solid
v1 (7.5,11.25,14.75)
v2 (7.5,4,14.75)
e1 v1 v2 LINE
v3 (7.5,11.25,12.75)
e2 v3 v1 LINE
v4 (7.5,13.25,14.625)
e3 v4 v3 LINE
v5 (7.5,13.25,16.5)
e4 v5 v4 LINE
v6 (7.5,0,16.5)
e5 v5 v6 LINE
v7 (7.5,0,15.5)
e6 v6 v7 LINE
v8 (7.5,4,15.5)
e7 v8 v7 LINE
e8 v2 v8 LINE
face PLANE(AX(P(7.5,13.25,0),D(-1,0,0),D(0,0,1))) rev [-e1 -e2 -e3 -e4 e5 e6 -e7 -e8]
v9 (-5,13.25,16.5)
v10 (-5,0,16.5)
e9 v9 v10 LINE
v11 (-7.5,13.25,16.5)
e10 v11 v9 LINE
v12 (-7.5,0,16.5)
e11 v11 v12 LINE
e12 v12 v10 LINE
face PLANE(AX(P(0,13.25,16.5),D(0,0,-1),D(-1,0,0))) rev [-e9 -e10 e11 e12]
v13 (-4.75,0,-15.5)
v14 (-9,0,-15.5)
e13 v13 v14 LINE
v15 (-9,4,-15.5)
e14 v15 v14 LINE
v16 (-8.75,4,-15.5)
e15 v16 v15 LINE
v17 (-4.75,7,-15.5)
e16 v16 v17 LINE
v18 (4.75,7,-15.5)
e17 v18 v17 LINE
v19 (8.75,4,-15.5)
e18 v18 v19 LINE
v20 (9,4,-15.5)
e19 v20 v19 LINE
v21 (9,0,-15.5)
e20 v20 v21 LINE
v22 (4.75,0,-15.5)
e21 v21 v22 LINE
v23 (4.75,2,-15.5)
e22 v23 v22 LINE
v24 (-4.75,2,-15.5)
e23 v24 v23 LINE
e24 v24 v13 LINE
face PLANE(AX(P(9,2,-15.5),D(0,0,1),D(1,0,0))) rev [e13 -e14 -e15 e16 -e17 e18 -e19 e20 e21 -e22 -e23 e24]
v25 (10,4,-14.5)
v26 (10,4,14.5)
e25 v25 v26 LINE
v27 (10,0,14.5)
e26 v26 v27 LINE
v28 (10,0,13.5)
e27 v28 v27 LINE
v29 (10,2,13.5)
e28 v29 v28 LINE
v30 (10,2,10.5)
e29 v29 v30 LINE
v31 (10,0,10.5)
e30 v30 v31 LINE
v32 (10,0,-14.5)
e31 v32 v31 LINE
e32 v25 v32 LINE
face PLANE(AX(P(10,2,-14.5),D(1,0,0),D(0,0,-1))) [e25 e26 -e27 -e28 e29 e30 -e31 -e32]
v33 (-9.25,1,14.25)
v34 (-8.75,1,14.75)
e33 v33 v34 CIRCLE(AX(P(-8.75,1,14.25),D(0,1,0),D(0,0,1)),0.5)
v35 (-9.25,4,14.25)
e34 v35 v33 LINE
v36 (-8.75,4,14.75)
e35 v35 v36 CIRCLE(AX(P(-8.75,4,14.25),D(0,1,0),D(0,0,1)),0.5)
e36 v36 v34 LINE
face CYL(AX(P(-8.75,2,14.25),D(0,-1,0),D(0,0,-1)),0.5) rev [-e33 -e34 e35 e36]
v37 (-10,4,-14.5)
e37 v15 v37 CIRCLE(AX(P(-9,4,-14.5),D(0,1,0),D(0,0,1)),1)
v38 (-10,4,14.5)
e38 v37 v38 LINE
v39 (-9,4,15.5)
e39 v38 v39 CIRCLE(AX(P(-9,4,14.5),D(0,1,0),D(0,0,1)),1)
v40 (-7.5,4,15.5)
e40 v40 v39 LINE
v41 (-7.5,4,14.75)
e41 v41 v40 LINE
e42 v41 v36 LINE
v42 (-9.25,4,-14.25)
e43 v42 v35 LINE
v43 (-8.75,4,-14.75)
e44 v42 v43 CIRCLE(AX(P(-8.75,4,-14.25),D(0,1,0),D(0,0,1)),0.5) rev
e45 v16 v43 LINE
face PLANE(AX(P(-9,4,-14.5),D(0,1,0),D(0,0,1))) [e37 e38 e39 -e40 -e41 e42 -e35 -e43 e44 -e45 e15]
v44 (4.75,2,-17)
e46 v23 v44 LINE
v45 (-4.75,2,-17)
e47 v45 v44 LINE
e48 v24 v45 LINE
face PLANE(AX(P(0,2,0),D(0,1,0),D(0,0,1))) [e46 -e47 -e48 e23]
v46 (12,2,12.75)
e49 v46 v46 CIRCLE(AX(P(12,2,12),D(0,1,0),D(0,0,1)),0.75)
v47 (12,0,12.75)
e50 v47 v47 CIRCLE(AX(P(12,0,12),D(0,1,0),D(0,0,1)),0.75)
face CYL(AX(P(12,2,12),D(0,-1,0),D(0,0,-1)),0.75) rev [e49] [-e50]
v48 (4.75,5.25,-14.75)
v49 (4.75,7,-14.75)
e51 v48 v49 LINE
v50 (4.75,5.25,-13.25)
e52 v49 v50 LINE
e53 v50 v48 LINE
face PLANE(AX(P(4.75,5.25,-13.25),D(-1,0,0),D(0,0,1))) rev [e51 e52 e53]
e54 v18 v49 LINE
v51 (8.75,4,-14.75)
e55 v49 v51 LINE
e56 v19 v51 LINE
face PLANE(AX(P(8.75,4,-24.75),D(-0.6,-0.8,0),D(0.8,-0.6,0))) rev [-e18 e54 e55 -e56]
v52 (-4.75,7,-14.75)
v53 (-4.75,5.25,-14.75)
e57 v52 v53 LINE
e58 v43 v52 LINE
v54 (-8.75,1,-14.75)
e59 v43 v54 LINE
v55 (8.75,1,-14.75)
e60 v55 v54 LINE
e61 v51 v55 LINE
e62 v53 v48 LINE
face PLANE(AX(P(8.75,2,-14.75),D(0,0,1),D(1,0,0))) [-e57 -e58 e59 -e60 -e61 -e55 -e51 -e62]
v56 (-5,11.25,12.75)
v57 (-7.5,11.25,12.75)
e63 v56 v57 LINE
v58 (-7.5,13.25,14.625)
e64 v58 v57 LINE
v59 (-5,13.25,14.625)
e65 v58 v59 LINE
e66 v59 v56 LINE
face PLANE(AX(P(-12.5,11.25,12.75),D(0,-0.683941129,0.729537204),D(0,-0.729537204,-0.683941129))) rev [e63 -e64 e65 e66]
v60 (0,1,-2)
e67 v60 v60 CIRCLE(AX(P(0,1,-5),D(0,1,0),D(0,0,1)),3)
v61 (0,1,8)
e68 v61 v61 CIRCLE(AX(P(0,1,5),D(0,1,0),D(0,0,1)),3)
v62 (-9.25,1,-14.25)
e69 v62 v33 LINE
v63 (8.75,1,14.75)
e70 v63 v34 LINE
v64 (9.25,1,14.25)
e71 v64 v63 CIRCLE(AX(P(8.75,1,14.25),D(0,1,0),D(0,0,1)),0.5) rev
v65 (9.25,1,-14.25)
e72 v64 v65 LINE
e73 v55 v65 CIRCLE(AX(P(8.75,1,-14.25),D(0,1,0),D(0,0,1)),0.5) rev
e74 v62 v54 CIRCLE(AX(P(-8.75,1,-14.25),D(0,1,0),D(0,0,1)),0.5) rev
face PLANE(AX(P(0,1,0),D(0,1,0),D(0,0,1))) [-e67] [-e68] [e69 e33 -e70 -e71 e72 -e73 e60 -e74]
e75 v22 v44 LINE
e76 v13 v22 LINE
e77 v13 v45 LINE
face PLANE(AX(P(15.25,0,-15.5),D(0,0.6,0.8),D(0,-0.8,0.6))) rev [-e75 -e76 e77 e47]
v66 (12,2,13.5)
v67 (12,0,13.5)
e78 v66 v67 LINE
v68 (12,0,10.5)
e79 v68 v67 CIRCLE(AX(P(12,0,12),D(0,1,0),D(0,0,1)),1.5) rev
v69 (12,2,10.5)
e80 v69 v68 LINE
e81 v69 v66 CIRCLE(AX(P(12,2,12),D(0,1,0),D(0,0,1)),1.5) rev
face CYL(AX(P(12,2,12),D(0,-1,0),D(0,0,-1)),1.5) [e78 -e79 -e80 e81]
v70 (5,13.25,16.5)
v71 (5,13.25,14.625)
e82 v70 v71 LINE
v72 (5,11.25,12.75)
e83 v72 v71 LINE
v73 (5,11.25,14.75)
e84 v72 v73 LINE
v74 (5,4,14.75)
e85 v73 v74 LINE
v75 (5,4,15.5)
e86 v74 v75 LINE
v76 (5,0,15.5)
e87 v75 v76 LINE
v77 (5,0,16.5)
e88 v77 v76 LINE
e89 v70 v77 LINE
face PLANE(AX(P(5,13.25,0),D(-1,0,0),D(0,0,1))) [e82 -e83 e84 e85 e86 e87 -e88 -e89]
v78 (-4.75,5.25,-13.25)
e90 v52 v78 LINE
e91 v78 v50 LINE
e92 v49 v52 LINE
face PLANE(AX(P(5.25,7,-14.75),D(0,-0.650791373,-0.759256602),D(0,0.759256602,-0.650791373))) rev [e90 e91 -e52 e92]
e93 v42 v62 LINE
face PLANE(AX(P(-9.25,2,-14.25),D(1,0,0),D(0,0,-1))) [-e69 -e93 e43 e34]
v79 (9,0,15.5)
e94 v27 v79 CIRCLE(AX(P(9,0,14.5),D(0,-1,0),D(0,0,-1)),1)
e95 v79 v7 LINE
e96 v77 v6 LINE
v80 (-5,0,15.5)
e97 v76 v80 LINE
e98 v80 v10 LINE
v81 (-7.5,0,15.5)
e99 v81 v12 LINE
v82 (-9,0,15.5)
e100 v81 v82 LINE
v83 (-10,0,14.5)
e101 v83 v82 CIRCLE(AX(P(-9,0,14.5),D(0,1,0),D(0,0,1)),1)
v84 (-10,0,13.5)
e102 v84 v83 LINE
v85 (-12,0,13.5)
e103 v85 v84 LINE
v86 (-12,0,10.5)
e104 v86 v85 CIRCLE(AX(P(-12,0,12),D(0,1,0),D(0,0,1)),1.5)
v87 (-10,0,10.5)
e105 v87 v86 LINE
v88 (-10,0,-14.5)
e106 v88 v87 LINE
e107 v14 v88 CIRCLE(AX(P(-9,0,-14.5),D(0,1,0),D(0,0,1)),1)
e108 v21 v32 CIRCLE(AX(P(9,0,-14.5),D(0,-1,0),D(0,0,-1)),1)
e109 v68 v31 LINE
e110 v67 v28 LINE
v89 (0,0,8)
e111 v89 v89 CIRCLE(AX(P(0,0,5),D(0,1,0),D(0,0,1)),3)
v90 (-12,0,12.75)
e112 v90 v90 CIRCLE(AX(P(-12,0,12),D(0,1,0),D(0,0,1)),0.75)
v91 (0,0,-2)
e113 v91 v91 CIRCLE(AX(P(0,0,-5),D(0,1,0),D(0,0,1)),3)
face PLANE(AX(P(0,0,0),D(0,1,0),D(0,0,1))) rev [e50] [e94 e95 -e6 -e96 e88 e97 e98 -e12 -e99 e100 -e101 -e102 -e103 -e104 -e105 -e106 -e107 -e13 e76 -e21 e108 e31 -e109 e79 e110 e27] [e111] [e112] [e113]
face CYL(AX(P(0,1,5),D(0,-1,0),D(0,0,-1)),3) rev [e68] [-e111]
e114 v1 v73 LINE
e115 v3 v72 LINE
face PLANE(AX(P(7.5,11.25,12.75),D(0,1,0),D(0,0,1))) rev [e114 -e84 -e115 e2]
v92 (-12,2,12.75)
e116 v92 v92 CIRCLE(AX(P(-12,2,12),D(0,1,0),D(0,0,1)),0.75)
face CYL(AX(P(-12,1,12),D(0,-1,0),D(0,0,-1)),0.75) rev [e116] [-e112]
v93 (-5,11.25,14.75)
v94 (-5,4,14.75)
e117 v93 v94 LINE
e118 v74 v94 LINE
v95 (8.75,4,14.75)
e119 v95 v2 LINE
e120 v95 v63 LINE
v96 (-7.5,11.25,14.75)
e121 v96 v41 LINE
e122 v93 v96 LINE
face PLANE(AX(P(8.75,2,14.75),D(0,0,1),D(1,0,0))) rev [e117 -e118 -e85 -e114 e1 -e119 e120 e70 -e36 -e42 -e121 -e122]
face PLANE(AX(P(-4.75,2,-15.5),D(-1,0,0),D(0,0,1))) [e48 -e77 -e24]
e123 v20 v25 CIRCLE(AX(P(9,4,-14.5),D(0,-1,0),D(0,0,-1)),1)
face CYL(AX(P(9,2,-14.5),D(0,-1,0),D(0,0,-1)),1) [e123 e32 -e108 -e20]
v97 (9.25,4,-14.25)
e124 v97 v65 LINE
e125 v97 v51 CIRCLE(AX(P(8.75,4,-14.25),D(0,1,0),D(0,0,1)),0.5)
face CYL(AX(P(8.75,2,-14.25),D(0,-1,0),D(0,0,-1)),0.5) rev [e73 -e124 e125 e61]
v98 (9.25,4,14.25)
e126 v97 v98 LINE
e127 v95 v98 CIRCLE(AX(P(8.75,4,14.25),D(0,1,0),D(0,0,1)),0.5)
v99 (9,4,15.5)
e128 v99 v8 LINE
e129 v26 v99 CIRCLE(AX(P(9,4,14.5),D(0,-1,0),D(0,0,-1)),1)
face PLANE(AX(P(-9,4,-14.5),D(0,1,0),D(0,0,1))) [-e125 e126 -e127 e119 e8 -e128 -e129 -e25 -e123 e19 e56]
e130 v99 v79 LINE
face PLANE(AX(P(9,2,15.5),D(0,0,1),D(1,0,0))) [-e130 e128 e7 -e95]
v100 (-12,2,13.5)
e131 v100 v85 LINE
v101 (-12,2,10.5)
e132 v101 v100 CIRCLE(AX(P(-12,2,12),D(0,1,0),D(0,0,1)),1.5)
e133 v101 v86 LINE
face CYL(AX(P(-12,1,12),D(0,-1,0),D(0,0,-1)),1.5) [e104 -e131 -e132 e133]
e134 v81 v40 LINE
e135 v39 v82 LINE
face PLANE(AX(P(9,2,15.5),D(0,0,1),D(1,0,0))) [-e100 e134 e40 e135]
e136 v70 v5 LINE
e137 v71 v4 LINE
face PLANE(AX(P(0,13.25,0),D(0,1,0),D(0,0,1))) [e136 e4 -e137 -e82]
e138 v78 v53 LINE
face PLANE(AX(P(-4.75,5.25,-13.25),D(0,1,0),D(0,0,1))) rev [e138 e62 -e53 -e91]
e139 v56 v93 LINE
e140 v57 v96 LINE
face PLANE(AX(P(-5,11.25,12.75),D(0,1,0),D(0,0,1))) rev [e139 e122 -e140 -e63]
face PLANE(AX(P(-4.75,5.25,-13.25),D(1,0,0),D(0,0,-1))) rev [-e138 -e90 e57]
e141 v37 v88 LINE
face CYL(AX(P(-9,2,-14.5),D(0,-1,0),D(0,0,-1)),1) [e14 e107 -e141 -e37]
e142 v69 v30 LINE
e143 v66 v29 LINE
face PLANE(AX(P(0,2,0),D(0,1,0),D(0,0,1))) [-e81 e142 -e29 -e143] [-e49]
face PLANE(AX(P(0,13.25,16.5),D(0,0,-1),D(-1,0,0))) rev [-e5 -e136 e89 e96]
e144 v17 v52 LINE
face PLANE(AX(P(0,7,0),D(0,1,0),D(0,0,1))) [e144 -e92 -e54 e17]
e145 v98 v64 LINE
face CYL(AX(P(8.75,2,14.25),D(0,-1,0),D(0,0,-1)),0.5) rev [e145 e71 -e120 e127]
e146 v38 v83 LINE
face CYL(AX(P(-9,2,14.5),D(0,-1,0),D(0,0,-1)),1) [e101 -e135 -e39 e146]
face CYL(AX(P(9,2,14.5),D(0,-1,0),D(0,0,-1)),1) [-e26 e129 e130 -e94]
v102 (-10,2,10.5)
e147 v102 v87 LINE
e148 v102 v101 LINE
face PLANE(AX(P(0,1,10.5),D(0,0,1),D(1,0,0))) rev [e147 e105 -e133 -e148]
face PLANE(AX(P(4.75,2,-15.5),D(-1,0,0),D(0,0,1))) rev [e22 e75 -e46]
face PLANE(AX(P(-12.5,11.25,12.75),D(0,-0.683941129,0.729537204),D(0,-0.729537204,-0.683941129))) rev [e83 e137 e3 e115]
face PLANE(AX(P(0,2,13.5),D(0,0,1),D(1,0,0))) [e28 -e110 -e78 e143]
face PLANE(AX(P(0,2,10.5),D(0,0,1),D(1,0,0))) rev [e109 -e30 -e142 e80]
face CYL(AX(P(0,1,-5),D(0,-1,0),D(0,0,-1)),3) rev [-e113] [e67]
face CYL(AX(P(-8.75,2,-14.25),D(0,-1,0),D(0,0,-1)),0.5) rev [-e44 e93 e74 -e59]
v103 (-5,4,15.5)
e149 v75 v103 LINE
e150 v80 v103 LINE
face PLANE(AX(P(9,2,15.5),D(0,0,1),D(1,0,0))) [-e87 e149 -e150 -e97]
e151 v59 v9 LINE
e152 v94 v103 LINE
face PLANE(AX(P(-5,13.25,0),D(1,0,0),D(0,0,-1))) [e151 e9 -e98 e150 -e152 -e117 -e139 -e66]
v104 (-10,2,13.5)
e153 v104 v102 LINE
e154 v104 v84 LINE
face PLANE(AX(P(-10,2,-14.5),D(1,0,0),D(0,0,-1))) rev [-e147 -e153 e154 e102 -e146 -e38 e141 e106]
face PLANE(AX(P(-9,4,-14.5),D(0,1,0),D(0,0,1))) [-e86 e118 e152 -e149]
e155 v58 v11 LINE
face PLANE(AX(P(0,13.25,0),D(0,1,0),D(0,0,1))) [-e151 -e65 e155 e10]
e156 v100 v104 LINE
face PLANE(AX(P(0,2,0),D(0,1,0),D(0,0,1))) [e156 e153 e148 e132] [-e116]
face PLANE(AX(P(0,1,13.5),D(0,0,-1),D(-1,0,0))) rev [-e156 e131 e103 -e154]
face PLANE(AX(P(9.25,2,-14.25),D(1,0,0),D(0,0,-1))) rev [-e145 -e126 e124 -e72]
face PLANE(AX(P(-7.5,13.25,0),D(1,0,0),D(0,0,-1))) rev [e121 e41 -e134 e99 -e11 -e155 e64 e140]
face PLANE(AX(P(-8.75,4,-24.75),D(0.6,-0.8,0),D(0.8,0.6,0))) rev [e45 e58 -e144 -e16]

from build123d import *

# Parameters (mm, degrees)
PCB_HOLDER_R             = 0.75
BOSS_EXTRUDE19_DEPTH     = 1
PCB_HOLDER_R_2           = 3
BOSS_EXTRUDE19_2_DEPTH   = 1
BOSS_EXTRUDE20_OUTLINE_R = 0.75
BOSS_EXTRUDE20_DEPTH     = 2
BOSS_EXTRUDE21_DEPTH     = 4
BOSS_EXTRUDE22_DEPTH     = 7
PCB_HOLDER_49_W          = 2.5
PCB_HOLDER_49_H          = 1
PCB_HOLDER_49_H_2        = 0.75
BOSS_EXTRUDE23_DEPTH     = 13.25
SKETCH10_W               = 2.5
SKETCH10_H               = 2
BOSS_EXTRUDE24_DEPTH     = 2
CUT_EXTRUDE9_DEPTH       = 20
CUT_EXTRUDE10_DEPTH      = 20
SKETCH9_W                = 9.5
SKETCH9_H                = 1.75
BOSS_EXTRUDE25_DEPTH     = 1.5
CUT_EXTRUDE11_DEPTH      = 10
CUT_EXTRUDE12_DEPTH      = 10
CUT_EXTRUDE13_DEPTH      = 10


# Read off the part's stored shape, not the designer's step: Boss-Extrude20
with BuildPart() as part:
    # PCB holder → Boss-Extrude19 (new body)
    with BuildSketch(Plane(origin=(0, 0, 0), x_dir=(1, 0, 0), z_dir=(0, 1, 0))):
        with BuildLine():
            Line((-10, -13.5), (-10, -10.5))
            Line((-10, -10.5), (-12, -10.5))
            ThreePointArc((-12, -10.5), (-13.5, -12), (-12, -13.5))
            Line((-12, -13.5), (-10, -13.5))
        make_face()
        with Locations(Location((-12, -12, 0), (0, 0, 270))):
            Circle(PCB_HOLDER_R, mode=Mode.SUBTRACT)
    extrude(amount=BOSS_EXTRUDE19_DEPTH)

    # Boss-Extrude20 outline → Boss-Extrude20 (add)
    with BuildSketch(Plane(origin=(0, 0, 0), x_dir=(1, 0, 0), z_dir=(0, 1, 0))):
        with BuildLine():
            Line((10, -14.5), (10, -13.5))
            Line((10, -13.5), (12, -13.5))
            ThreePointArc((12, -13.5), (13.5, -12), (12, -10.5))
            Line((12, -10.5), (10, -10.5))
            Line((10, -10.5), (10, 14.5))
            ThreePointArc((10, 14.5), (9.707106781, 15.207106781), (9, 15.5))
            Line((9, 15.5), (4.75, 15.5))
            Line((4.75, 15.5), (4.75, 17))
            Line((4.75, 17), (-4.75, 17))
            Line((-4.75, 17), (-4.75, 15.5))
            Line((-4.75, 15.5), (-9, 15.5))
            ThreePointArc((-9, 15.5), (-9.707106781, 15.207106781), (-10, 14.5))
            Line((-10, 14.5), (-10, -10.5))
            Line((-10, -10.5), (-12, -10.5))
            ThreePointArc((-12, -10.5), (-13.5, -12), (-12, -13.5))
            Line((-12, -13.5), (-10, -13.5))
            Line((-10, -13.5), (-10, -14.5))
            ThreePointArc((-10, -14.5), (-9.707106781, -15.207106781), (-9, -15.5))
            Line((-9, -15.5), (9, -15.5))
            ThreePointArc((9, -15.5), (9.707106781, -15.207106781), (10, -14.5))
        make_face()
        with Locations((12, -12)):
            Circle(BOSS_EXTRUDE20_OUTLINE_R, mode=Mode.SUBTRACT)
        with BuildLine():
            Line((-8.75, 14.75), (8.75, 14.75))
            ThreePointArc((8.75, 14.75), (9.103553391, 14.603553391), (9.25, 14.25))
            Line((9.25, 14.25), (9.25, -14.25))
            ThreePointArc((9.25, -14.25), (9.103553391, -14.603553391), (8.75, -14.75))
            Line((8.75, -14.75), (-8.75, -14.75))
            ThreePointArc((-8.75, -14.75), (-9.103553391, -14.603553391), (-9.25, -14.25))
            Line((-9.25, -14.25), (-9.25, 14.25))
            ThreePointArc((-9.25, 14.25), (-9.103553391, 14.603553391), (-8.75, 14.75))
        make_face(mode=Mode.SUBTRACT)
        with Locations((-12, -12)):
            Circle(BOSS_EXTRUDE20_OUTLINE_R, mode=Mode.SUBTRACT)
    extrude(amount=BOSS_EXTRUDE20_DEPTH)



with BuildPart() as body_2:
    # PCB holder → Boss-Extrude19 2 (new body)
    with BuildSketch(Plane(origin=(0, 0, 0), x_dir=(1, 0, 0), z_dir=(0, 1, 0))):
        with BuildLine():
            Line((8.75, 14.75), (-8.75, 14.75))
            ThreePointArc((-8.75, 14.75), (-9.103553391, 14.603553391), (-9.25, 14.25))
            Line((-9.25, 14.25), (-9.25, -14.25))
            ThreePointArc((-9.25, -14.25), (-9.103553391, -14.603553391), (-8.75, -14.75))
            Line((-8.75, -14.75), (7.5, -14.75))
            Line((7.5, -14.75), (7.5, -15.5))
            Line((7.5, -15.5), (9, -15.5))
            ThreePointArc((9, -15.5), (9.707106781, -15.207106781), (10, -14.5))
            Line((10, -14.5), (10, -13.5))
            Line((10, -13.5), (12, -13.5))
            ThreePointArc((12, -13.5), (13.5, -12), (12, -10.5))
            Line((12, -10.5), (10, -10.5))
            Line((10, -10.5), (10, 14.5))
            ThreePointArc((10, 14.5), (9.707106781, 15.207106781), (9, 15.5))
            Line((9, 15.5), (8.75, 15.5))
            Line((8.75, 15.5), (8.75, 14.75))
        make_face()
        with Locations(Location((0, -5, 0), (0, 0, 270))):
            Circle(PCB_HOLDER_R_2, mode=Mode.SUBTRACT)
        with Locations(Location((0, 5, 0), (0, 0, 270))):
            Circle(PCB_HOLDER_R_2, mode=Mode.SUBTRACT)
        with Locations(Location((12, -12, 0), (0, 0, 270))):
            Circle(PCB_HOLDER_R, mode=Mode.SUBTRACT)
    extrude(amount=BOSS_EXTRUDE19_2_DEPTH)

    # PCB holder<47> → Boss-Extrude21 (add)
    with BuildSketch(Plane(origin=(0, 0, 0), x_dir=(1, 0, 0), z_dir=(0, 1, 0))):
        with BuildLine():
            Line((9, 15.5), (-9, 15.5))
            ThreePointArc((-9, 15.5), (-9.707106781, 15.207106781), (-10, 14.5))
            Line((-10, 14.5), (-10, -14.5))
            ThreePointArc((-10, -14.5), (-9.707106781, -15.207106781), (-9, -15.5))
            Line((-9, -15.5), (9, -15.5))
            ThreePointArc((9, -15.5), (9.707106781, -15.207106781), (10, -14.5))
            Line((10, -14.5), (10, 14.5))
            ThreePointArc((10, 14.5), (9.707106781, 15.207106781), (9, 15.5))
        make_face()
        with BuildLine():
            Line((9.25, 14.25), (9.25, -14.25))
            ThreePointArc((9.25, -14.25), (9.103553391, -14.603553391), (8.75, -14.75))
            Line((8.75, -14.75), (-8.75, -14.75))
            ThreePointArc((-8.75, -14.75), (-9.103553391, -14.603553391), (-9.25, -14.25))
            Line((-9.25, -14.25), (-9.25, 14.25))
            ThreePointArc((-9.25, 14.25), (-9.103553391, 14.603553391), (-8.75, 14.75))
            Line((-8.75, 14.75), (8.75, 14.75))
            ThreePointArc((8.75, 14.75), (9.103553391, 14.603553391), (9.25, 14.25))
        make_face(mode=Mode.SUBTRACT)
    extrude(amount=BOSS_EXTRUDE21_DEPTH)

    # PCB holder<48> → Boss-Extrude22 (add)
    with BuildSketch(Plane(origin=(0, 0, 0), x_dir=(1, 0, 0), z_dir=(0, 1, 0))):
        Polygon((-4.75, 15.5), (-8.75, 15.5), (-8.75, 14.75), (8.75, 14.75), (8.75, 15.5), (4.75, 15.5), align=None)
    extrude(amount=BOSS_EXTRUDE22_DEPTH)


with BuildPart() as part_1:
    add(part.part)

    add(body_2.part)  # Boss-Extrude23 merges body 2
    # PCB holder<49> → Boss-Extrude23 (add)
    with BuildSketch(Plane(origin=(0, 0, 0), x_dir=(1, 0, 0), z_dir=(0, 1, 0))):
        with Locations((-6.25, -16)):
            Rectangle(PCB_HOLDER_49_W, PCB_HOLDER_49_H)
        with Locations((6.25, -16)):
            Rectangle(PCB_HOLDER_49_W, PCB_HOLDER_49_H)
        with Locations((-6.25, -15.125)):
            Rectangle(PCB_HOLDER_49_W, PCB_HOLDER_49_H_2)
        with Locations((6.25, -15.125)):
            Rectangle(PCB_HOLDER_49_W, PCB_HOLDER_49_H_2)
    extrude(amount=BOSS_EXTRUDE23_DEPTH)

    # Sketch10 → Boss-Extrude24 (add)
    with BuildSketch(Plane(origin=(0, 0, 14.75), x_dir=(-1, 0, 0), z_dir=(0, 0, -1))):
        with Locations((-6.25, 12.25)):
            Rectangle(SKETCH10_W, SKETCH10_H)
        with Locations((6.25, 12.25)):
            Rectangle(SKETCH10_W, SKETCH10_H)
    extrude(amount=BOSS_EXTRUDE24_DEPTH)

    # Sketch11 → Cut-Extrude9 (cut)
    with BuildSketch(Plane(origin=(7.5, 0, 0), x_dir=(0, 0, -1), z_dir=(1, 0, 0))):
        Polygon((-12.75, 11.25), (-14.625, 13.25), (-12.75, 13.25), align=None)
    extrude(amount=-CUT_EXTRUDE9_DEPTH, mode=Mode.SUBTRACT)

    # Sketch12 → Cut-Extrude10 (cut)
    with BuildSketch(Plane.ZY.offset(4.75)):
        Polygon((-15.5, 0), (-17, 2), (-17, 0), align=None)
    extrude(amount=-CUT_EXTRUDE10_DEPTH, mode=Mode.SUBTRACT)

    # Sketch9 → Boss-Extrude25 (add)
    with BuildSketch(Plane.XY.offset(-14.75)):
        with Locations((0, 6.125)):
            Rectangle(SKETCH9_W, SKETCH9_H)
    extrude(amount=BOSS_EXTRUDE25_DEPTH)

    # Sketch15 → Cut-Extrude11 (cut)
    with BuildSketch(Plane.ZY.offset(4.75)):
        Polygon((-14.75, 7), (-13.25, 5.25), (-13.25, 7), align=None)
    extrude(amount=-CUT_EXTRUDE11_DEPTH, mode=Mode.SUBTRACT)

    # Sketch16 → Cut-Extrude12 (cut)
    with BuildSketch(Plane.XY.offset(-14.75)):
        Polygon((8.75, 4), (4.75, 7), (8.75, 7), align=None)
    extrude(amount=-CUT_EXTRUDE12_DEPTH, mode=Mode.SUBTRACT)

    # Sketch17 → Cut-Extrude13 (cut)
    with BuildSketch(Plane.XY.offset(-14.75)):
        Polygon((-8.75, 4), (-4.75, 7), (-8.75, 7), align=None)
    extrude(amount=-CUT_EXTRUDE13_DEPTH, mode=Mode.SUBTRACT)


solid = part_1.part
